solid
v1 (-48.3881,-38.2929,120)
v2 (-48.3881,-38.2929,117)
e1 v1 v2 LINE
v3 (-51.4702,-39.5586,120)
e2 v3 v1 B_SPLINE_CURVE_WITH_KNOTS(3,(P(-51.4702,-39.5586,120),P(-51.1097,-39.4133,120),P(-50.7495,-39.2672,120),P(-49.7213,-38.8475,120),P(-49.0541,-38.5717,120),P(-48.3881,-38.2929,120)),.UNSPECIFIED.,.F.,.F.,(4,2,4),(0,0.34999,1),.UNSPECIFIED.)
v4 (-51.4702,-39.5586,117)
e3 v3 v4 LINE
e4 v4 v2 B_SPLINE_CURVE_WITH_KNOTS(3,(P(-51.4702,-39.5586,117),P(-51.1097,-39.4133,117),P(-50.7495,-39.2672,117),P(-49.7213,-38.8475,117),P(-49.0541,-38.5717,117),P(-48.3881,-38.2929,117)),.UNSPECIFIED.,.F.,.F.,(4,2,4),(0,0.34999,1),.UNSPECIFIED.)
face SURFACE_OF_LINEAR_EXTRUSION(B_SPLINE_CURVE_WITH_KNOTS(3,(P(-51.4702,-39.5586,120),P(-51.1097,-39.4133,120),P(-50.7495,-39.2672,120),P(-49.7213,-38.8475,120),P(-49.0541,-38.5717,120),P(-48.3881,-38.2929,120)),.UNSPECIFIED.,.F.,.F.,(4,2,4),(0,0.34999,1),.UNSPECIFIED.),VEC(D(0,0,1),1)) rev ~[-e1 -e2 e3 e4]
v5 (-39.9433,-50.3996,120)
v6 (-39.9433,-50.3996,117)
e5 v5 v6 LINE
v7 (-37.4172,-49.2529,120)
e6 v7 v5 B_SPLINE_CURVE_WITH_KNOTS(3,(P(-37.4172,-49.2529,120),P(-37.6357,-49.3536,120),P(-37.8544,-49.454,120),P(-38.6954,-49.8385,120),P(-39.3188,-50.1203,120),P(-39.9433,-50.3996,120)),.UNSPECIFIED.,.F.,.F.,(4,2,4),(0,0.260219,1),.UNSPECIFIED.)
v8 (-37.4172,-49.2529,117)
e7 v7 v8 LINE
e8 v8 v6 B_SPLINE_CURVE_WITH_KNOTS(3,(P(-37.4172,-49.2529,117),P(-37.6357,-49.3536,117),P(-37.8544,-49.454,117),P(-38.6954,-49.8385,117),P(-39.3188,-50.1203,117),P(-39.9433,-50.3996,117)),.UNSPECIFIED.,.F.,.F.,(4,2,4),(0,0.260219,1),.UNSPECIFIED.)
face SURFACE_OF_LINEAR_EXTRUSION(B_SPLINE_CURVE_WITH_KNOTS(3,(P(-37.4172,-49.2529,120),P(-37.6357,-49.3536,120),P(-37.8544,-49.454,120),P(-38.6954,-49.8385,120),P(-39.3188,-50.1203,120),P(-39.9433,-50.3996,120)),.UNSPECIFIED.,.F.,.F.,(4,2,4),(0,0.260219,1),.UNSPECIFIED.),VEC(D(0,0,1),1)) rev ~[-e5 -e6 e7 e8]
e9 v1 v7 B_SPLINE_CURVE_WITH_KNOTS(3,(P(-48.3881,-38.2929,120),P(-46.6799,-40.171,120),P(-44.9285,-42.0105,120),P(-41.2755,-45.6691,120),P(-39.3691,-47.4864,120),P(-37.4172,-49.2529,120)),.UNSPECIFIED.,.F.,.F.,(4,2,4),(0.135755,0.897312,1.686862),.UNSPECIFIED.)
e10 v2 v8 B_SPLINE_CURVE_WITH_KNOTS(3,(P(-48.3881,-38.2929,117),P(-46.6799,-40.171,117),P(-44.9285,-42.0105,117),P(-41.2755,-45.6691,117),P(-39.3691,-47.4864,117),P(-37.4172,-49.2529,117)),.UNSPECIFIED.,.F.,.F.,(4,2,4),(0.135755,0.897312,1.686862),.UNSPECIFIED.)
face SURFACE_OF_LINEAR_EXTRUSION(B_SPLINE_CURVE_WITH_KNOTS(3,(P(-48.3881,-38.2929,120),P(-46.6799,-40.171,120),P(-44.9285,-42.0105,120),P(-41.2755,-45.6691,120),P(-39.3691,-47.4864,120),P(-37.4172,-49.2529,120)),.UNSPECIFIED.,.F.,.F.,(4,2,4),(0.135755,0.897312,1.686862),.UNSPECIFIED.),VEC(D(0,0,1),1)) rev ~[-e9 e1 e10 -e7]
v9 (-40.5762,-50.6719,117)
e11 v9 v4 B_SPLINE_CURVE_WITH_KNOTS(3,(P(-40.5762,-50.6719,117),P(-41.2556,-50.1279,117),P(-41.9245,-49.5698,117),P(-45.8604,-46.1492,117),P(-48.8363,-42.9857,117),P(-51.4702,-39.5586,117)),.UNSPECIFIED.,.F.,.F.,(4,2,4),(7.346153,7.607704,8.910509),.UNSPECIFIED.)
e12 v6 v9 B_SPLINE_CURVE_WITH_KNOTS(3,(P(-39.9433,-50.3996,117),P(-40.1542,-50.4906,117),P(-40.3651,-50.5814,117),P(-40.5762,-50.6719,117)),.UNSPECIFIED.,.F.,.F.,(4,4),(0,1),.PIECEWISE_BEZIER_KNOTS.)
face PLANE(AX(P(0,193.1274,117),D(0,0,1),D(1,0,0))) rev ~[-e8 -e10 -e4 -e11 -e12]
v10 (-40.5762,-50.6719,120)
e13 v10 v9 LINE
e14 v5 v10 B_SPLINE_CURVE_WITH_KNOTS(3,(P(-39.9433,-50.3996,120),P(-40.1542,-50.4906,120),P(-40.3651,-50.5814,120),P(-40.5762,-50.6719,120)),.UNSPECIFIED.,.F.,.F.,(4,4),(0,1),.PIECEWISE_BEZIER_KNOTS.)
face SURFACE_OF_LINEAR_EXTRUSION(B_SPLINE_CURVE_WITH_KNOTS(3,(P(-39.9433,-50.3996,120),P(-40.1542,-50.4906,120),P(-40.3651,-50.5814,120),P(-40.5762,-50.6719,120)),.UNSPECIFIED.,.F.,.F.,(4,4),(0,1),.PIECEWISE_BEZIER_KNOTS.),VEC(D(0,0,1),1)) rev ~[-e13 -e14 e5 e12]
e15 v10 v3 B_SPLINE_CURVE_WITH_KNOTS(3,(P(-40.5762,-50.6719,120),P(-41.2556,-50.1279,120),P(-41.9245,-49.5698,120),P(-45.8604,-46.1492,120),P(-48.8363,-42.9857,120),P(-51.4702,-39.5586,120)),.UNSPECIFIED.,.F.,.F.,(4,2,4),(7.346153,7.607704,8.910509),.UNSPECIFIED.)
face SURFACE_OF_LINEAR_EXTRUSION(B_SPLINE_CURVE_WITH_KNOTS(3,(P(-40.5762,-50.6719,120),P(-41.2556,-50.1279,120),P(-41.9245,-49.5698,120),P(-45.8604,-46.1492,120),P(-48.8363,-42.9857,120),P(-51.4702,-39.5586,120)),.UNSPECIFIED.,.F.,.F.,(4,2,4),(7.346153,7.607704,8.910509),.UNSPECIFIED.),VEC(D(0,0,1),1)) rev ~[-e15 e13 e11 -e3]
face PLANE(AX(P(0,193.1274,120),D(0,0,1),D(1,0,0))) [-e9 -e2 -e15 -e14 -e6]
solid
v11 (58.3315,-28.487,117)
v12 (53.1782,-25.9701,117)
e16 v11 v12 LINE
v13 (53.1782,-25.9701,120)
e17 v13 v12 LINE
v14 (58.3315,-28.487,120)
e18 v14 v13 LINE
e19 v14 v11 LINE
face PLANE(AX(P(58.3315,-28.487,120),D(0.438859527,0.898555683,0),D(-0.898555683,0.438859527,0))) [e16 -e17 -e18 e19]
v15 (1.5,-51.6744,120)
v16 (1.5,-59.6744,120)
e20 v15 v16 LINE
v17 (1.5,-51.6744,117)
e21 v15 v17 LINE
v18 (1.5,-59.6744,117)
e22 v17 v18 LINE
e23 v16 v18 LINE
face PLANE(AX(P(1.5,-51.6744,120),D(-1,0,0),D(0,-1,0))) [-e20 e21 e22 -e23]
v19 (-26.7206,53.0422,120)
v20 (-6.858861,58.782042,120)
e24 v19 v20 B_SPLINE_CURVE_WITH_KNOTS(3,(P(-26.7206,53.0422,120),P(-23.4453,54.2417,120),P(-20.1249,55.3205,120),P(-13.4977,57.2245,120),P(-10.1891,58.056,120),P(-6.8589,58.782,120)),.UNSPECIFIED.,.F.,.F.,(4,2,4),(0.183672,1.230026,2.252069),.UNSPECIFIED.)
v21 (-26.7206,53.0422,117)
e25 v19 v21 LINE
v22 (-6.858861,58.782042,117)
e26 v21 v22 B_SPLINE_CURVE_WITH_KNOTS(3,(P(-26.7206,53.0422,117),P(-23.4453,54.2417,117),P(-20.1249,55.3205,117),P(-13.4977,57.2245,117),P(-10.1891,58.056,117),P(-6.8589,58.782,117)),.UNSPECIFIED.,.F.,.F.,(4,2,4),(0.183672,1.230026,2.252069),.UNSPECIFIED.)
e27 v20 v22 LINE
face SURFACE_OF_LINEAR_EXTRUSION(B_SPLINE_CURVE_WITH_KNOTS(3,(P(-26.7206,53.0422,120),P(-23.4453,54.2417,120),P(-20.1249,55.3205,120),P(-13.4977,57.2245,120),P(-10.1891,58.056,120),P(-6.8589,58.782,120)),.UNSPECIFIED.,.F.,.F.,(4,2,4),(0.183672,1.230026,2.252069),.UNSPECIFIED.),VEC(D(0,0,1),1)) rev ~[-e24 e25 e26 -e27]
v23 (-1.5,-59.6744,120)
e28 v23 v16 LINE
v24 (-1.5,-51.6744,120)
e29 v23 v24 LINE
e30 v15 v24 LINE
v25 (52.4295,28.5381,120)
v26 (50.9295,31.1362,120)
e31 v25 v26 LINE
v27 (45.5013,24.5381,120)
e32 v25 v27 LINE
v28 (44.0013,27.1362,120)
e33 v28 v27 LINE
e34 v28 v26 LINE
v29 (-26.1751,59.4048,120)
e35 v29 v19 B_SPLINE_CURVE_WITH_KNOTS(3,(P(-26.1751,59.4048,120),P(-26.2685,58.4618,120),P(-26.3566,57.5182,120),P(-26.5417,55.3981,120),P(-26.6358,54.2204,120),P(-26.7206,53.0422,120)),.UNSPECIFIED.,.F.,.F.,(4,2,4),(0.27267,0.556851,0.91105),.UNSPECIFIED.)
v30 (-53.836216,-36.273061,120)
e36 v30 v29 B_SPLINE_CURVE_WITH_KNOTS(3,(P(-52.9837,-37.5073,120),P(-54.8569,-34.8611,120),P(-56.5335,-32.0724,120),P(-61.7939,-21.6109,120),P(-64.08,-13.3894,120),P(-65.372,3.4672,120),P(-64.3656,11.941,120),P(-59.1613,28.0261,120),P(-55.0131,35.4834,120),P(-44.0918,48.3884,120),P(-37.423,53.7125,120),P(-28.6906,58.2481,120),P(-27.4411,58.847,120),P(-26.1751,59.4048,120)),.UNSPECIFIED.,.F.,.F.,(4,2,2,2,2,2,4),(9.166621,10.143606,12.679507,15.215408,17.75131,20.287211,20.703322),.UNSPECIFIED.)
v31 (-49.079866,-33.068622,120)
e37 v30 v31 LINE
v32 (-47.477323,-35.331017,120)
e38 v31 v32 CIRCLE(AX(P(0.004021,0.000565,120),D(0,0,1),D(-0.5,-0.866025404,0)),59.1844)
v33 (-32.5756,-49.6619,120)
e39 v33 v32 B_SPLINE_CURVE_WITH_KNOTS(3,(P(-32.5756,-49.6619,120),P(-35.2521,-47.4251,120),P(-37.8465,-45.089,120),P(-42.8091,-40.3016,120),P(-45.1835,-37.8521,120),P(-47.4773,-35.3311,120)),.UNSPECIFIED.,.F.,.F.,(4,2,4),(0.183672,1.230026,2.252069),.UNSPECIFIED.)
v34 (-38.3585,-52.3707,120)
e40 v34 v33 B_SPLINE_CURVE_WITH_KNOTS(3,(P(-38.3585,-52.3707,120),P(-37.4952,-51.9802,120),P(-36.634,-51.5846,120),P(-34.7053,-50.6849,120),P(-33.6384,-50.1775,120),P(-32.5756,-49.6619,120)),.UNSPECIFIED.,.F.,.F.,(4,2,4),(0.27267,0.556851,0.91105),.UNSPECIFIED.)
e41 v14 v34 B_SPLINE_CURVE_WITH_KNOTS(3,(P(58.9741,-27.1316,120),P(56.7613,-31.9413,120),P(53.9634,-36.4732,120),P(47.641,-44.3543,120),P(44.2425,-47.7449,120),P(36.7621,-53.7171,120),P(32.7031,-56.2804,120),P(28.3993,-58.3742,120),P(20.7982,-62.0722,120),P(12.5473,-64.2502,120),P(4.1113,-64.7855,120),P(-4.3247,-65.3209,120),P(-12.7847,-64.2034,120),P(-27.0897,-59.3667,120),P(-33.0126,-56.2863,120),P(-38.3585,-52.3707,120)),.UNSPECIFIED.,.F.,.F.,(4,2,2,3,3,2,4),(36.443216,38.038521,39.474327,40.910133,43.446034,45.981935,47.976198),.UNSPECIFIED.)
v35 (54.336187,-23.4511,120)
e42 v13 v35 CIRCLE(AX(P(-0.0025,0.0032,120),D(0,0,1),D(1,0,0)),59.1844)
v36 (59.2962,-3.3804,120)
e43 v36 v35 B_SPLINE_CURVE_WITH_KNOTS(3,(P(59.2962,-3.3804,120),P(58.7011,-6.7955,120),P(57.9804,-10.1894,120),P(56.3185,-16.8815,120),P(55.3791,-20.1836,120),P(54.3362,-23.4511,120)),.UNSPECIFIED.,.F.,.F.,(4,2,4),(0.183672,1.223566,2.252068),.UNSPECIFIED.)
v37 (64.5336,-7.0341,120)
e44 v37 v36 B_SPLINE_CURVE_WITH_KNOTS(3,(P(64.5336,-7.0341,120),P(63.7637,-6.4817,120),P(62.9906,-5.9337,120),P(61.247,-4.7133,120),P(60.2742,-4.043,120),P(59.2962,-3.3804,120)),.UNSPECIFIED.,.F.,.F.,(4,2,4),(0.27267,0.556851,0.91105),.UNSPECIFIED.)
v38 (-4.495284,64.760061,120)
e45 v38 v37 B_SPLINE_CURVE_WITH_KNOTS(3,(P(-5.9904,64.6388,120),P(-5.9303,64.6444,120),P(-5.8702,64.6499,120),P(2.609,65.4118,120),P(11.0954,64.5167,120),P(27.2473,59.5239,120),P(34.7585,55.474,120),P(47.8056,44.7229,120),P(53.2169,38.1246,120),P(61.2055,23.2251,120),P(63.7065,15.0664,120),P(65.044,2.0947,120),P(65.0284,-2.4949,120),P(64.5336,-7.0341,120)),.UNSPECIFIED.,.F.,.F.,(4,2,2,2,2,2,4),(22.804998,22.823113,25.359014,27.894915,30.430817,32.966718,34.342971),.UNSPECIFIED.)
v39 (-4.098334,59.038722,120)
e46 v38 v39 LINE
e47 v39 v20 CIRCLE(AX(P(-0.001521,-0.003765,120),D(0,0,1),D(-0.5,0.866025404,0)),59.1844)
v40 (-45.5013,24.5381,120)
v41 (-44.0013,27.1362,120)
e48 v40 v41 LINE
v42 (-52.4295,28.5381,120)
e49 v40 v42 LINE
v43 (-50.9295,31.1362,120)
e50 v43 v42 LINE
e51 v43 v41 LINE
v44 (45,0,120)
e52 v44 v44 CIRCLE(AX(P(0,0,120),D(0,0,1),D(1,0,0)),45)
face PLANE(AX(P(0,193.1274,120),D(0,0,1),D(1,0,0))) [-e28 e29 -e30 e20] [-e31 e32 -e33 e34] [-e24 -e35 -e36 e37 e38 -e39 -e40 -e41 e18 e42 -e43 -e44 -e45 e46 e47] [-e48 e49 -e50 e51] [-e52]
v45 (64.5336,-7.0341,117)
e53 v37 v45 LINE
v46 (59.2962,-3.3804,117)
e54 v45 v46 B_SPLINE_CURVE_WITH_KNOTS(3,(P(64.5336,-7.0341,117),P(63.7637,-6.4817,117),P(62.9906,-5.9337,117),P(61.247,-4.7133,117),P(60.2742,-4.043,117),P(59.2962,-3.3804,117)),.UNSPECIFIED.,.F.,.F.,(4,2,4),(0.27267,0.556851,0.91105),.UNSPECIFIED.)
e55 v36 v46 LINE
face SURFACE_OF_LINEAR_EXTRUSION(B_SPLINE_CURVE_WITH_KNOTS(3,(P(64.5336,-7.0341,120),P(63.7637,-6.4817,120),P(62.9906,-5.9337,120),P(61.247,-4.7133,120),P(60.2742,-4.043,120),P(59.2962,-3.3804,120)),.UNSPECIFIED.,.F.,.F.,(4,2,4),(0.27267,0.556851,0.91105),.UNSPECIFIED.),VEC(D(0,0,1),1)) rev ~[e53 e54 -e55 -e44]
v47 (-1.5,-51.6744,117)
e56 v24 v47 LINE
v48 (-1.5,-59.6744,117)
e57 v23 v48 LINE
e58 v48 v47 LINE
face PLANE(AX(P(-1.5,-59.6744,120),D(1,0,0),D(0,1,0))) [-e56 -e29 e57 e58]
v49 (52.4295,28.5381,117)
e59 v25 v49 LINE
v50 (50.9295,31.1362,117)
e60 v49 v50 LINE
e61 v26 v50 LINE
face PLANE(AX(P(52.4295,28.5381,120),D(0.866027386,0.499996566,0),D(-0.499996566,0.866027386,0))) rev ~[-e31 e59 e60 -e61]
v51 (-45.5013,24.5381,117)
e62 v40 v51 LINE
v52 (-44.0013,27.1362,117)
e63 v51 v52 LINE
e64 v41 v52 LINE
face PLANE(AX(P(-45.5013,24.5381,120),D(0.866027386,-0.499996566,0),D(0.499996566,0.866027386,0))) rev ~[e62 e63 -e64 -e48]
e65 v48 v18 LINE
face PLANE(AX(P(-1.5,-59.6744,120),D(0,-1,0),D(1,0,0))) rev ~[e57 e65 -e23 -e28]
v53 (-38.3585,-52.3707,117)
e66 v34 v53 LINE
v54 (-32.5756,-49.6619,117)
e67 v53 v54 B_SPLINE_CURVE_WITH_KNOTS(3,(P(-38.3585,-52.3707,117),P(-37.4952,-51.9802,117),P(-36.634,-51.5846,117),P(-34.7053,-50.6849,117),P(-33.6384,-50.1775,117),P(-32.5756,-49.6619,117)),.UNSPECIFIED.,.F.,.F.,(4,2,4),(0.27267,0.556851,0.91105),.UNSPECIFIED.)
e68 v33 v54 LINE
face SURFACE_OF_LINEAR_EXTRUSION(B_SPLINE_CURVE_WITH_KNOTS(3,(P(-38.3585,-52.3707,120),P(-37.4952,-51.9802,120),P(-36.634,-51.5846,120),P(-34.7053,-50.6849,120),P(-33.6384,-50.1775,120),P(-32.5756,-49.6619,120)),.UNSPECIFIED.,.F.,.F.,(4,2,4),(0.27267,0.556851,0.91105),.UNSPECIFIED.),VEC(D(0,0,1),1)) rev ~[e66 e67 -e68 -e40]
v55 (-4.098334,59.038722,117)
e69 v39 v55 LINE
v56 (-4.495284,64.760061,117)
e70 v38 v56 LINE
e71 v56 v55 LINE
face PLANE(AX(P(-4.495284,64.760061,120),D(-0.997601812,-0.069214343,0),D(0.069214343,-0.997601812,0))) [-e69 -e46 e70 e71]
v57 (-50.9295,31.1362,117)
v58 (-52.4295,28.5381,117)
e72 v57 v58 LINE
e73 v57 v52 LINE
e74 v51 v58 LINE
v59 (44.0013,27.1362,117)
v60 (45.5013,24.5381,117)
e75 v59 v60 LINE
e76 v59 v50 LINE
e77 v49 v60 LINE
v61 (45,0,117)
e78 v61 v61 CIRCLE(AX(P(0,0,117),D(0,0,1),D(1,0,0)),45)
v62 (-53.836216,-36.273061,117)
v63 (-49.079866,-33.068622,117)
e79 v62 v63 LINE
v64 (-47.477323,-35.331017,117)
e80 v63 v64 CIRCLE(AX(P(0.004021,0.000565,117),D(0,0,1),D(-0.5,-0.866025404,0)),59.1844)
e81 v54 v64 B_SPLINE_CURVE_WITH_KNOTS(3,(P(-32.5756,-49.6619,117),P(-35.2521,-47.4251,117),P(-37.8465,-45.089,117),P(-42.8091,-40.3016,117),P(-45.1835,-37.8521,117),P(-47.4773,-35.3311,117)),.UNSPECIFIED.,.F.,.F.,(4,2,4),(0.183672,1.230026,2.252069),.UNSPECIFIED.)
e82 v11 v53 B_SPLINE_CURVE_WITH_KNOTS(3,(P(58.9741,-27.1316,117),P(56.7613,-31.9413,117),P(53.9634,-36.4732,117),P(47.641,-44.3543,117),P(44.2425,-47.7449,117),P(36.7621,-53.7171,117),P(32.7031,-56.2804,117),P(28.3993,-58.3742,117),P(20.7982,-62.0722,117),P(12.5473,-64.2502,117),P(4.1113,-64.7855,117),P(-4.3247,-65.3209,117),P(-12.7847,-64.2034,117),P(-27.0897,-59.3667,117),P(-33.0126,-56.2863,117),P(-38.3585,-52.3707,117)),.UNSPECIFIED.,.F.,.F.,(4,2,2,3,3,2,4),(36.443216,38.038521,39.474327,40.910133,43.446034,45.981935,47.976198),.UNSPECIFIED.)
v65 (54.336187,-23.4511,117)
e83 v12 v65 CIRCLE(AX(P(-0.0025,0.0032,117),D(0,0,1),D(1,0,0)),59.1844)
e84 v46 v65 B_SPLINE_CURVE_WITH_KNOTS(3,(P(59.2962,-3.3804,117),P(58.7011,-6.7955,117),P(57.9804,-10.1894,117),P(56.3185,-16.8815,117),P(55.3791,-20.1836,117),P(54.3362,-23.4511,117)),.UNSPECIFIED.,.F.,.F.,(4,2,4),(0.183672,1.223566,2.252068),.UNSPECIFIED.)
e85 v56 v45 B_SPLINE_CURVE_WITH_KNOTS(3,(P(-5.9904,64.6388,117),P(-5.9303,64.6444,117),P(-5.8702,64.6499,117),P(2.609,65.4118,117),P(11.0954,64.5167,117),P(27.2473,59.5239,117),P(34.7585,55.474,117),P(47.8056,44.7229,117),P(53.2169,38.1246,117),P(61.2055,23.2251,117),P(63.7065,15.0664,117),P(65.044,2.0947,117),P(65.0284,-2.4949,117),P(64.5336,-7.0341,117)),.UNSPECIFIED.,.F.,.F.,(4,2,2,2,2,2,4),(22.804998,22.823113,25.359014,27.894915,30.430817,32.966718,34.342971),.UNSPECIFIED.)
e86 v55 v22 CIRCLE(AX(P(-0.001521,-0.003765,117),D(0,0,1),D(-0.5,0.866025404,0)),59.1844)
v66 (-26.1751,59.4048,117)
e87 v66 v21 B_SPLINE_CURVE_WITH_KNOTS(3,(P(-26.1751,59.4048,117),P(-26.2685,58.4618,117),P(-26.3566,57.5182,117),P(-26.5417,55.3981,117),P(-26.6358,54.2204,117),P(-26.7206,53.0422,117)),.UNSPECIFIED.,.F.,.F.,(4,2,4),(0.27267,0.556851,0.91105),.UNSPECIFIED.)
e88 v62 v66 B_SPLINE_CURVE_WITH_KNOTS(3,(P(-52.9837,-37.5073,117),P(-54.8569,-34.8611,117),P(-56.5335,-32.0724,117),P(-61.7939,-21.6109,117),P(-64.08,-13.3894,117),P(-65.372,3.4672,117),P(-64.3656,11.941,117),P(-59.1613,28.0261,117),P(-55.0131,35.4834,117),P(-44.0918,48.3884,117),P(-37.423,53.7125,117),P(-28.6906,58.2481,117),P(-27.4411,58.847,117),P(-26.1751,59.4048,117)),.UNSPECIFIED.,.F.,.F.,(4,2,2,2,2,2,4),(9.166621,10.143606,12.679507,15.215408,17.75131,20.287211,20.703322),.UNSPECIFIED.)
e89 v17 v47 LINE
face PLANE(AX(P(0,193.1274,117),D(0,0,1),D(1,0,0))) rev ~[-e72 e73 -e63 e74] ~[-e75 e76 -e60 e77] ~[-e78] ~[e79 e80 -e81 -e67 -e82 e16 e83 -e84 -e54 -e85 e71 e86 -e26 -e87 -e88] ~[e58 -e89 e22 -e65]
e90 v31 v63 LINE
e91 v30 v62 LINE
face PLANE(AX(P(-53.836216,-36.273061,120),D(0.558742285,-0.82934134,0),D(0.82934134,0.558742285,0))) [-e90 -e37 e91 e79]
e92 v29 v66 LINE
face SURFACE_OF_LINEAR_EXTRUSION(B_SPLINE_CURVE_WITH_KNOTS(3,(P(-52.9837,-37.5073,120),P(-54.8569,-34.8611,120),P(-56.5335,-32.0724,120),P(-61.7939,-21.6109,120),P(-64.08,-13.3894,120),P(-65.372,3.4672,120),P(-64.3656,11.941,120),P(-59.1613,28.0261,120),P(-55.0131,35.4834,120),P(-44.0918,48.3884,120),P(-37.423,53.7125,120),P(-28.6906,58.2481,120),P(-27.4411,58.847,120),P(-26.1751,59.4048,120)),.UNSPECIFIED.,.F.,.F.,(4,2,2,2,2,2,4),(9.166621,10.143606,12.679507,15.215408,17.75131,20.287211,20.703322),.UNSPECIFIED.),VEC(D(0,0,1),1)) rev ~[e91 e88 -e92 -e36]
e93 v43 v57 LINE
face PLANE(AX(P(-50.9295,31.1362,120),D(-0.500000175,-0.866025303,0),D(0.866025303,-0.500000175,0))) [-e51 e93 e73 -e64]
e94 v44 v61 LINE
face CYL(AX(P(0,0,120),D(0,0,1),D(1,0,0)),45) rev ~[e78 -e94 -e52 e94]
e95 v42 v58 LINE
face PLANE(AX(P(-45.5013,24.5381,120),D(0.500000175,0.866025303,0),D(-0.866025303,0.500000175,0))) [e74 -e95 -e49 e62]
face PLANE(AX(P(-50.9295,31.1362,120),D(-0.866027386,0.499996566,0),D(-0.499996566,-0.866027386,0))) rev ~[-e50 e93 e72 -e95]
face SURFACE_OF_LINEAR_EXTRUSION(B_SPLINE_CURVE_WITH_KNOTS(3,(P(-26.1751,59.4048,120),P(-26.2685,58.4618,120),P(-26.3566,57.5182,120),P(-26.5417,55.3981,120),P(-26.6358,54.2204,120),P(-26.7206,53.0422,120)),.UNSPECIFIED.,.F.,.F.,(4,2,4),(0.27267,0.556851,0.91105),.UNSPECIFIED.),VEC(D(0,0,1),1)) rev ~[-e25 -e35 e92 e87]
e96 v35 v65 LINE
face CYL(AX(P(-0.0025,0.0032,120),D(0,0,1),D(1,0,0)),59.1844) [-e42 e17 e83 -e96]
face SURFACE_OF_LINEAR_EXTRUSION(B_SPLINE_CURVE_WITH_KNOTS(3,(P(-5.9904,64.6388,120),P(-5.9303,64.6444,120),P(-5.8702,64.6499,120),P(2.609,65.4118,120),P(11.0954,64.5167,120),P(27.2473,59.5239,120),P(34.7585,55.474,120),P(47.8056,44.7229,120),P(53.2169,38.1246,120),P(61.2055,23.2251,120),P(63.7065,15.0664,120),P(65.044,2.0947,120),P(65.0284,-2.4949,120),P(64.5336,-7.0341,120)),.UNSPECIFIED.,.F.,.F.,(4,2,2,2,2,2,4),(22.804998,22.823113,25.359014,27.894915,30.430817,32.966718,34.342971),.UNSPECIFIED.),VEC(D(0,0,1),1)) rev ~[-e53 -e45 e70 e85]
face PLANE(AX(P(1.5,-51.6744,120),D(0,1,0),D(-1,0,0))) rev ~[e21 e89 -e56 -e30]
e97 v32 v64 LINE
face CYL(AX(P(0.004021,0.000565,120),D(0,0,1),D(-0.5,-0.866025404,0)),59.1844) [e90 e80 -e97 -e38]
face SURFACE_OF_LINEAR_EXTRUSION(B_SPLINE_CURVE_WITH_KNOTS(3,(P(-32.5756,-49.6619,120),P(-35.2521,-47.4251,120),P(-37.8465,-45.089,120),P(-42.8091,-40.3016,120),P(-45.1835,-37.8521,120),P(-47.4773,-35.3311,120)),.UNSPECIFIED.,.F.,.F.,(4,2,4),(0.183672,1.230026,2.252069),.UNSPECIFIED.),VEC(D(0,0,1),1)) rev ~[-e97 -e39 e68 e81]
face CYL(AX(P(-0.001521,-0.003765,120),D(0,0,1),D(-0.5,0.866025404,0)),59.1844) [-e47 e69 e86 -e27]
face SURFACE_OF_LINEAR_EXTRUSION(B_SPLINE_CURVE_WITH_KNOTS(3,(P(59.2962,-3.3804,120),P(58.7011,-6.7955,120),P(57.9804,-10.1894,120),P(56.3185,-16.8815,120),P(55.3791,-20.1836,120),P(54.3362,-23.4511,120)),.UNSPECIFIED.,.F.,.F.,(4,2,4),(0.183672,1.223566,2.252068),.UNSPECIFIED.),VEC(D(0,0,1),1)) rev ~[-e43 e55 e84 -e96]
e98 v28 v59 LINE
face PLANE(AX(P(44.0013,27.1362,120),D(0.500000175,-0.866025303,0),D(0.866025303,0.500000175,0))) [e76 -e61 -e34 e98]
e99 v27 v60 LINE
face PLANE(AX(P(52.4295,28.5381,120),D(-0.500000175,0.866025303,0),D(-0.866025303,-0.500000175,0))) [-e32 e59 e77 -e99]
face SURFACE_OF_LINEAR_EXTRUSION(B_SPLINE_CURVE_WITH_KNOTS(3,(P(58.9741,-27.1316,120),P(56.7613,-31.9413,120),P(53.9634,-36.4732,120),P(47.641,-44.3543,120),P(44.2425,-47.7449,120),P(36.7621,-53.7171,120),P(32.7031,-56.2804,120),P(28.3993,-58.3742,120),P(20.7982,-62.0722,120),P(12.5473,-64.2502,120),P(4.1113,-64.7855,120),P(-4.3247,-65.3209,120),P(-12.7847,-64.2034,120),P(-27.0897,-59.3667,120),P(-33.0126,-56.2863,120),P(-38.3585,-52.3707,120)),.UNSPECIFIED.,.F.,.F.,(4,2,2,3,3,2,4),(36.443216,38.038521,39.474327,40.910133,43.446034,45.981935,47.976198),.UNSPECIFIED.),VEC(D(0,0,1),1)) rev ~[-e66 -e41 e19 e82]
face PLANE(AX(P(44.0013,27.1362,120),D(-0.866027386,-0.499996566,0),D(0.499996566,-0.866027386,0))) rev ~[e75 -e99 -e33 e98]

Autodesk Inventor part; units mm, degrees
ref_plane "YZ Plane" through (0, 0, 0) normal (1, 0, 0) x (0, 1, 0)
ref_plane "XZ Plane" through (0, 0, 0) normal (0, 1, 0) x (-1, 0, 0)
ref_plane "XY Plane" through (0, 0, 0) normal (0, 0, 1) x (1, 0, 0)
ref_plane "Work Plane1" through (0, 193.1274, 120) normal (0, 0, 1) x (1, 0, 0)
sketch "Sketch1" plane through (0, 193.1274, 120) normal (0, 0, 1) x (1, 0, 0)
  spline S0 degree 3 poles (-8.5236, -128.7736) (-8.5781, -129.1585) (-8.6317, -129.5435) (-8.7822, -130.6438) (-8.877, -131.3595) (-8.9685, -132.0756) knots 0 0 0 0 0.34999 0.34999 1 1 1 1
  spline S1 degree 3 poles (-8.9685, -132.0756) (-11.4491, -132.616) (-13.9179, -133.213) (-18.9128, -134.5473) (-21.4399, -135.2896) (-23.9457, -136.0968) knots 0.135755 0.135755 0.135755 0.135755 0.897312 0.897312 1.686862 1.686862 1.686862 1.686862
  spline S2 degree 3 poles (-23.9457, -136.0968) (-23.9236, -135.8572) (-23.9012, -135.6176) (-23.8137, -134.697) (-23.7461, -134.0162) (-23.6756, -133.3357) knots 0 0 0 0 0.260219 0.260219 1 1 1 1
  spline S3 degree 3 poles (-23.6756, -133.3357) (-23.6491, -133.1076) (-23.6222, -132.8795) (-23.595, -132.6515) knots 0 0 0 0 1 1 1 1
  spline S4 degree 3 poles (-23.595, -132.6515) (-18.7496, -130.761) (-13.6896, -129.4578) (-8.5236, -128.7736) knots 20.983609 20.983609 20.983609 20.983609 22.549805 22.549805 22.549805 22.549805
  spline S5 degree 3 poles (59.9939, -217.9227) (59.6983, -217.6913) (59.4023, -217.4606) (58.5248, -216.78) (57.9417, -216.3318) (57.3567, -215.8863) knots 0 0 0 0 0.337929 0.337929 1 1 1 1
  spline S6 degree 3 poles (57.3567, -215.8863) (58.129, -213.4679) (58.8464, -211.0314) (60.1883, -206.0385) (60.809, -203.4788) (61.3628, -200.9052) knots 0.135755 0.135755 0.135755 0.135755 0.897312 0.897312 1.686862 1.686862 1.686862 1.686862
  spline S7 degree 3 poles (61.3628, -200.9052) (61.5593, -201.0441) (61.7556, -201.1833) (62.5091, -201.7193) (63.0649, -202.1183) (63.6189, -202.5196) knots 0 0 0 0 0.260219 0.260219 1 1 1 1
  spline S8 degree 3 poles (63.6189, -202.5196) (63.8032, -202.6566) (63.9873, -202.794) (64.1712, -202.9316) knots 0 0 0 0 1 1 1 1
  spline S9 degree 3 poles (64.1712, -202.9316) (63.7306, -205.8156) (63.0951, -208.6728) (61.6213, -213.6722) (60.8623, -215.8215) (59.9939, -217.9227) knots 34.623618 34.623618 34.623618 34.623618 35.502619 35.502619 36.187238 36.187238 36.187238 36.187238
  spline S10 degree 3 poles (-32.5756, -242.7893) (-35.2521, -240.5525) (-37.8465, -238.2164) (-42.8091, -233.429) (-45.1835, -230.9795) (-47.4773, -228.4585) knots 0.183672 0.183672 0.183672 0.183672 1.230026 1.230026 2.252069 2.252069 2.252069 2.252069
  spline S11 degree 3 poles (-47.4773, -228.4585) (-48.486, -228.8718) (-49.4978, -229.2781) (-51.3339, -230.0008) (-52.1579, -230.3199) (-52.9837, -230.6347) knots 0.191156 0.191156 0.191156 0.191156 0.518074 0.518074 0.783091 0.783091 0.783091 0.783091
  spline S12 degree 3 poles (-52.9837, -230.6347) (-54.8569, -227.9885) (-56.5335, -225.1998) (-61.7939, -214.7383) (-64.08, -206.5168) (-65.372, -189.6602) (-64.3656, -181.1864) (-59.1613, -165.1013) (-55.0131, -157.644) (-44.0918, -144.739) (-37.423, -139.4149) (-28.6906, -134.8793) (-27.4411, -134.2804) (-26.1751, -133.7226) knots 9.166621 9.166621 9.166621 9.166621 10.143606 10.143606 12.679507 12.679507 15.215408 15.215408 17.75131 17.75131 20.287211 20.287211 20.703322 20.703322 20.703322 20.703322
  spline S13 degree 3 poles (-26.1751, -133.7226) (-26.2685, -134.6656) (-26.3566, -135.6092) (-26.5417, -137.7293) (-26.6358, -138.907) (-26.7206, -140.0852) knots 0.27267 0.27267 0.27267 0.27267 0.556851 0.556851 0.91105 0.91105 0.91105 0.91105
  spline S14 degree 3 poles (-26.7206, -140.0852) (-23.4453, -138.8857) (-20.1249, -137.8069) (-13.4977, -135.9029) (-10.1891, -135.0714) (-6.8589, -134.3454) knots 0.183672 0.183672 0.183672 0.183672 1.230026 1.230026 2.252069 2.252069 2.252069 2.252069
  spline S15 degree 3 poles (-6.8589, -134.3454) (-6.7126, -133.2651) (-6.5585, -132.1857) (-6.2663, -130.2343) (-6.1307, -129.3611) (-5.9904, -128.4886) knots 0.191156 0.191156 0.191156 0.191156 0.518074 0.518074 0.783091 0.783091 0.783091 0.783091
  spline S16 degree 3 poles (-5.9904, -128.4886) (-5.9303, -128.483) (-5.8702, -128.4775) (2.609, -127.7156) (11.0954, -128.6107) (27.2473, -133.6035) (34.7585, -137.6534) (47.8056, -148.4045) (53.2169, -155.0028) (61.2055, -169.9023) (63.7065, -178.061) (65.044, -191.0327) (65.0284, -195.6223) (64.5336, -200.1615) knots 22.804998 22.804998 22.804998 22.804998 22.823113 22.823113 25.359014 25.359014 27.894915 27.894915 30.430817 30.430817 32.966718 32.966718 34.342971 34.342971 34.342971 34.342971
  spline S17 degree 3 poles (64.5336, -200.1615) (63.7637, -199.6091) (62.9906, -199.0611) (61.247, -197.8407) (60.2742, -197.1704) (59.2962, -196.5078) knots 0.27267 0.27267 0.27267 0.27267 0.556851 0.556851 0.91105 0.91105 0.91105 0.91105
  spline S18 degree 3 poles (59.2962, -196.5078) (58.7011, -199.9229) (57.9804, -203.3168) (56.3185, -210.0089) (55.3791, -213.311) (54.3362, -216.5785) knots 0.183672 0.183672 0.183672 0.183672 1.223566 1.223566 2.252068 2.252068 2.252068 2.252068
  spline S19 degree 3 poles (54.3362, -216.5785) (55.1888, -217.2378) (56.0367, -217.9032) (57.5809, -219.1316) (58.279, -219.6934) (58.9741, -220.259) knots 0.191156 0.191156 0.191156 0.191156 0.514352 0.514352 0.783093 0.783093 0.783093 0.783093
  spline S20 degree 3 poles (-48.3881, -231.4203) (-46.6799, -233.2984) (-44.9285, -235.1379) (-41.2755, -238.7965) (-39.3691, -240.6138) (-37.4172, -242.3803) knots 0.135755 0.135755 0.135755 0.135755 0.897312 0.897312 1.686862 1.686862 1.686862 1.686862
  spline S21 degree 3 poles (-37.4172, -242.3803) (-37.6357, -242.481) (-37.8544, -242.5814) (-38.6954, -242.9659) (-39.3188, -243.2477) (-39.9433, -243.527) knots 0 0 0 0 0.260219 0.260219 1 1 1 1
  spline S22 degree 3 poles (-7.5005, -129.5095) (-7.584, -130.1058) (-7.6655, -130.7024) (-7.8244, -131.8995) (-7.9018, -132.5) (-7.977, -133.1007) knots 0 0 0 0 0.498609 0.498609 1 1 1 1
  spline S23 degree 3 poles (-7.2694, -129.468) (-7.3079, -129.4749) (-7.3464, -129.4818) (-7.4234, -129.4956) (-7.4619, -129.5026) (-7.5005, -129.5095) knots 0 0 0 0 0.500065 0.500065 1 1 1 1
  spline S24 degree 3 poles (-7.8342, -133.3176) (-7.745, -132.6733) (-7.6532, -132.0292) (-7.4648, -130.7461) (-7.3683, -130.1068) (-7.2694, -129.468) knots 0 0 0 0 0.50156 0.50156 1 1 1 1
  spline S25 degree 3 poles (-25.4683, -138.246) (-22.5608, -137.2415) (-19.6212, -136.3286) (-13.7391, -134.691) (-10.7949, -133.9632) (-7.8342, -133.3176) knots -1.831866 -1.831866 -1.831866 -1.831866 -0.909091 -0.909091 0 0 0 0
  spline S26 degree 3 poles (-24.8602, -131.8333) (-24.9726, -132.8737) (-25.0786, -133.9151) (-25.2822, -136.0525) (-25.3792, -137.149) (-25.4683, -138.246) knots -0.64407 -0.64407 -0.64407 -0.64407 -0.330168 -0.330168 0 0 0 0
  spline S27 degree 3 poles (-40.8735, -245.1308) (-42.2164, -244.0754) (-43.5199, -242.9667) (-51.1195, -235.9758) (-56.2587, -228.9623) (-63.5596, -213.3602) (-65.6514, -204.9207) (-66.4822, -187.715) (-65.2134, -179.1132) (-59.4499, -162.8802) (-55.0103, -155.4042) (-43.5155, -142.5746) (-36.5701, -137.3438) (-27.5163, -132.9614) (-26.1964, -132.3752) (-24.8602, -131.8333) knots -34.104259 -34.104259 -34.104259 -34.104259 -33.590314 -33.590314 -31.006444 -31.006444 -28.422574 -28.422574 -25.838703 -25.838703 -23.254833 -23.254833 -20.670963 -20.670963 -20.237237 -20.237237 -20.237237 -20.237237
  spline S28 degree 3 poles (-39.0691, -244.3542) (-39.3864, -244.4922) (-39.704, -244.6296) (-40.3055, -244.8884) (-40.5894, -245.0099) (-40.8735, -245.1308) knots 0 0 0 0 0.528438 0.528438 1 1 1 1
  spline S29 degree 3 poles (-35.2346, -242.5871) (-35.8743, -242.8888) (-36.5154, -243.1876) (-37.7935, -243.7765) (-38.4307, -244.0667) (-39.0691, -244.3542) knots 0 0 0 0 0.502528 0.502528 1 1 1 1
  spline S30 degree 3 poles (-47.9961, -230.049) (-46.0008, -232.2434) (-43.9453, -234.3847) (-39.6934, -238.5693) (-37.494, -240.6129) (-35.2346, -242.5871) knots -1.789969 -1.789969 -1.789969 -1.789969 -0.90011 -0.90011 0 0 0 0
  spline S31 degree 3 poles (-51.3445, -231.432) (-50.7863, -231.2062) (-50.2289, -230.9784) (-49.1128, -230.5175) (-48.554, -230.2843) (-47.9961, -230.049) knots 0 0 0 0 0.498609 0.498609 1 1 1 1
  spline S32 degree 3 poles (-51.496, -231.2526) (-51.4708, -231.2825) (-51.4455, -231.3124) (-51.395, -231.3722) (-51.3698, -231.4021) (-51.3445, -231.432) knots 0 0 0 0 0.500065 0.500065 1 1 1 1
  spline S33 degree 3 poles (-47.8797, -229.817) (-48.4823, -230.0619) (-49.086, -230.3044) (-50.2914, -230.7828) (-50.8933, -231.0189) (-51.496, -231.2526) knots 0 0 0 0 0.50156 0.50156 1 1 1 1
  spline S34 degree 3 poles (-34.7946, -242.6244) (-37.1182, -240.6086) (-39.3786, -238.5193) (-43.7379, -234.2441) (-45.8403, -232.0583) (-47.8797, -229.817) knots -1.831866 -1.831866 -1.831866 -1.831866 -0.909091 -0.909091 0 0 0 0
  spline S35 degree 3 poles (-40.6522, -245.304) (-39.695, -244.8812) (-38.7401, -244.4523) (-36.7872, -243.5599) (-35.7891, -243.0956) (-34.7946, -242.6244) knots -0.64407 -0.64407 -0.64407 -0.64407 -0.330168 -0.330168 0 0 0 0
  spline S36 degree 3 poles (0, -259.2712) (-7.8255, -259.2712) (-15.5958, -257.8824) (-29.3299, -252.8022) (-35.3004, -249.4738) (-40.6522, -245.304) knots -38.525501 -38.525501 -38.525501 -38.525501 -36.174184 -36.174184 -34.13245 -34.13245 -34.13245 -34.13245
  spline S37 degree 3 poles (65.473, -202.5232) (64.9341, -206.2791) (64.0716, -209.9903) (60.2232, -221.8041) (55.9814, -229.3941) (44.8272, -242.5208) (38.0214, -247.9321) (30.3701, -251.8868) (26.0379, -254.1258) (21.4715, -255.879) (12.0364, -258.3494) (7.1967, -259.0591) (1.5485, -259.2576) (0.774, -259.2712) (0, -259.2712) knots -6.311327 -6.311327 -6.311327 -6.311327 -5.167741 -5.167741 -2.58387 -2.58387 0 0 0 1.462965 1.462965 2.925931 2.925931 3.158484 3.158484 3.158484 3.158484
  spline S38 degree 3 poles (63.8982, -201.3489) (64.1764, -201.5546) (64.4542, -201.761) (64.9791, -202.1525) (65.2262, -202.3377) (65.473, -202.5232) knots 0 0 0 0 0.528438 0.528438 1 1 1 1
  spline S39 degree 3 poles (60.4507, -198.9117) (61.0317, -199.3148) (61.6111, -199.7206) (62.7601, -200.5331) (63.3301, -200.9398) (63.8982, -201.3489) knots 0 0 0 0 0.502528 0.502528 1 1 1 1
  spline S40 degree 3 poles (55.9731, -216.2325) (56.8758, -213.4073) (57.7025, -210.5565) (59.2006, -204.782) (59.8706, -201.8554) (60.4507, -198.9117) knots -1.789969 -1.789969 -1.789969 -1.789969 -0.90011 -0.90011 0 0 0 0
  spline S41 degree 3 poles (58.8449, -218.4408) (58.3703, -218.0703) (57.8944, -217.7014) (56.9372, -216.9653) (56.4558, -216.598) (55.9731, -216.2325) knots 0 0 0 0 0.498609 0.498609 1 1 1 1
  spline S42 degree 3 poles (58.7654, -218.6617) (58.7787, -218.6248) (58.7919, -218.5881) (58.8184, -218.5145) (58.8317, -218.4776) (58.8449, -218.4408) knots 0 0 0 0 0.500065 0.500065 1 1 1 1
  spline S43 degree 3 poles (55.7139, -216.2477) (56.2274, -216.6471) (56.7392, -217.0487) (57.7563, -217.8534) (58.2616, -218.2566) (58.7654, -218.6617) knots 0 0 0 0 0.50156 0.50156 1 1 1 1
  spline S44 degree 3 poles (60.2629, -198.512) (59.679, -201.5321) (58.9999, -204.5344) (57.477, -210.4472) (56.6352, -213.3609) (55.7139, -216.2477) knots -1.831866 -1.831866 -1.831866 -1.831866 -0.909091 -0.909091 0 0 0 0
  spline S45 degree 3 poles (65.5124, -202.245) (64.6675, -201.6274) (63.8187, -201.0149) (62.0694, -199.7698) (61.1683, -199.1376) (60.2629, -198.512) knots -0.64407 -0.64407 -0.64407 -0.64407 -0.330168 -0.330168 0 0 0 0
  spline S46 degree 3 poles (-24.5995, -131.7282) (-18.0519, -129.1049) (-11.117, -127.542) (4.5396, -126.5799) (13.1572, -127.7358) (29.4645, -133.2858) (36.9981, -137.6268) (49.9774, -148.9523) (55.2989, -155.8285) (63.0067, -171.2336) (65.3193, -179.6153) (66.3106, -192.8981) (66.1582, -197.6047) (65.5124, -202.245) knots -20.209057 -20.209057 -20.209057 -20.209057 -18.087092 -18.087092 -15.503222 -15.503222 -12.919352 -12.919352 -10.335481 -10.335481 -7.751611 -7.751611 -6.339562 -6.339562 -6.339562 -6.339562
  spline S47 degree 3 poles (-24.8291, -133.6792) (-24.79, -133.3354) (-24.7502, -132.9917) (-24.6736, -132.3413) (-24.6368, -132.0347) (-24.5995, -131.7282) knots 0 0 0 0 0.528438 0.528438 1 1 1 1
  spline S48 degree 3 poles (-25.216, -137.8835) (-25.1575, -137.1787) (-25.0957, -136.4741) (-24.9666, -135.0727) (-24.8993, -134.3758) (-24.8291, -133.6792) knots 0 0 0 0 0.502528 0.502528 1 1 1 1
  spline S49 degree 3 poles (-7.977, -133.1007) (-10.875, -133.7316) (-13.7572, -134.4411) (-19.5071, -136.031) (-22.3766, -136.914) (-25.216, -137.8835) knots -1.789969 -1.789969 -1.789969 -1.789969 -0.90011 -0.90011 0 0 0 0
  circle A0 centre (0, -193.1274) radius 45
  line L0 (44.0013, -165.9912) -> (50.9295, -161.9912)
  line L1 (52.4295, -164.5893) -> (50.9295, -161.9912)
  line L2 (52.4295, -164.5893) -> (45.5013, -168.5893)
  line L3 (44.0013, -165.9912) -> (45.5013, -168.5893)
  line L4 (-50.9295, -161.9912) -> (-44.0013, -165.9912)
  line L5 (-50.9295, -161.9912) -> (-52.4295, -164.5893)
  line L6 (-45.5013, -168.5893) -> (-52.4295, -164.5893)
  line L7 (-45.5013, -168.5893) -> (-44.0013, -165.9912)
  line L8 (-1.5, -252.8018) -> (-1.5, -244.8018)
  line L9 (1.5, -244.8018) -> (-1.5, -244.8018)
  line L10 (1.5, -244.8018) -> (1.5, -252.8018)
  line L11 (-1.5, -252.8018) -> (1.5, -252.8018)
  spline S50 degree 3 poles (-38.3585, -245.4981) (-37.4952, -245.1076) (-36.634, -244.712) (-34.7053, -243.8123) (-33.6384, -243.3049) (-32.5756, -242.7893) knots 0.27267 0.27267 0.27267 0.27267 0.556851 0.556851 0.91105 0.91105 0.91105 0.91105
  spline S51 degree 3 poles (58.9741, -220.259) (56.7613, -225.0687) (53.9634, -229.6006) (47.641, -237.4817) (44.2425, -240.8723) (36.7621, -246.8445) (32.7031, -249.4078) (28.3993, -251.5016) (20.7982, -255.1996) (12.5473, -257.3776) (4.1113, -257.9129) (-4.3247, -258.4483) (-12.7847, -257.3308) (-27.0897, -252.4941) (-33.0126, -249.4137) (-38.3585, -245.4981) knots 36.443216 36.443216 36.443216 36.443216 38.038521 38.038521 39.474327 39.474327 40.910133 40.910133 40.910133 43.446034 43.446034 43.446034 45.981935 45.981935 47.976198 47.976198 47.976198 47.976198
  spline S52 degree 3 poles (-40.5762, -243.7993) (-41.2556, -243.2553) (-41.9245, -242.6972) (-45.8604, -239.2766) (-48.8363, -236.1131) (-51.4702, -232.686) knots 7.346153 7.346153 7.346153 7.346153 7.607704 7.607704 8.910509 8.910509 8.910509 8.910509
  spline S53 degree 3 poles (-51.4702, -232.686) (-51.1097, -232.5407) (-50.7495, -232.3946) (-49.7213, -231.9749) (-49.0541, -231.6991) (-48.3881, -231.4203) knots 0 0 0 0 0.34999 0.34999 1 1 1 1
  spline S54 degree 3 poles (-39.9433, -243.527) (-40.1542, -243.618) (-40.3651, -243.7088) (-40.5762, -243.7993) knots 0 0 0 0 1 1 1 1
  point P0 (4.1113, -257.9129)
  dimension "d0" = 90
extrude "Extrusion1" add sketch "Sketch1" against normal blind 3 contours S10 S11 S12 S13 S14 S15 S16 S17 S18 S19 S51 S50 | S20 S21 S54 S52 S53
sketch "Sketch2" plane through (0, 193.1274, 120) normal (0, 0, 1) x (1, 0, 0)
  point P0 (0, -193.1274)
sketch "Sketch3" plane through (0, 193.1274, 120) normal (0, 0, 1) x (1, 0, 0)
  ellipse E0 centre (-53.6671, -215.1652) end of major axis (-140.5176, -322.1703) minor radius 96.9651 (54.3362, -216.5785) -> (59.2962, -196.5078) ccw projected
  ellipse E1 centre (-0.0025, -193.1242) end of major axis (40.4209, -243.9233) minor radius 64.9177 (4.1113, -257.9129) -> (58.9741, -220.259) ccw projected
  circle A0 centre (-0.0025, -193.1242) radius 59.1844
  line L0 (58.3315, -221.6144) -> (53.1782, -219.0975)
  spline S0 degree 3 poles (54.3362, -216.5785) (55.1888, -217.2378) (56.0367, -217.9032) (57.5809, -219.1316) (58.279, -219.6934) (58.9741, -220.259) knots 0.191156 0.191156 0.191156 0.191156 0.514352 0.514352 0.783093 0.783093 0.783093 0.783093 projected
  point P0 (0, -193.1274)
  dimension "d3" = 1.5
extrude "Extrusion2" cut sketch "Sketch3" against normal blind 3 contours S0 E1 L0 A0
pattern_circular "Circular Pattern1" count 3 over 360 about axis through (0, 0, 120) along (0, 0, -1) of "Extrusion2"
properties part number "top_centering_ring"
